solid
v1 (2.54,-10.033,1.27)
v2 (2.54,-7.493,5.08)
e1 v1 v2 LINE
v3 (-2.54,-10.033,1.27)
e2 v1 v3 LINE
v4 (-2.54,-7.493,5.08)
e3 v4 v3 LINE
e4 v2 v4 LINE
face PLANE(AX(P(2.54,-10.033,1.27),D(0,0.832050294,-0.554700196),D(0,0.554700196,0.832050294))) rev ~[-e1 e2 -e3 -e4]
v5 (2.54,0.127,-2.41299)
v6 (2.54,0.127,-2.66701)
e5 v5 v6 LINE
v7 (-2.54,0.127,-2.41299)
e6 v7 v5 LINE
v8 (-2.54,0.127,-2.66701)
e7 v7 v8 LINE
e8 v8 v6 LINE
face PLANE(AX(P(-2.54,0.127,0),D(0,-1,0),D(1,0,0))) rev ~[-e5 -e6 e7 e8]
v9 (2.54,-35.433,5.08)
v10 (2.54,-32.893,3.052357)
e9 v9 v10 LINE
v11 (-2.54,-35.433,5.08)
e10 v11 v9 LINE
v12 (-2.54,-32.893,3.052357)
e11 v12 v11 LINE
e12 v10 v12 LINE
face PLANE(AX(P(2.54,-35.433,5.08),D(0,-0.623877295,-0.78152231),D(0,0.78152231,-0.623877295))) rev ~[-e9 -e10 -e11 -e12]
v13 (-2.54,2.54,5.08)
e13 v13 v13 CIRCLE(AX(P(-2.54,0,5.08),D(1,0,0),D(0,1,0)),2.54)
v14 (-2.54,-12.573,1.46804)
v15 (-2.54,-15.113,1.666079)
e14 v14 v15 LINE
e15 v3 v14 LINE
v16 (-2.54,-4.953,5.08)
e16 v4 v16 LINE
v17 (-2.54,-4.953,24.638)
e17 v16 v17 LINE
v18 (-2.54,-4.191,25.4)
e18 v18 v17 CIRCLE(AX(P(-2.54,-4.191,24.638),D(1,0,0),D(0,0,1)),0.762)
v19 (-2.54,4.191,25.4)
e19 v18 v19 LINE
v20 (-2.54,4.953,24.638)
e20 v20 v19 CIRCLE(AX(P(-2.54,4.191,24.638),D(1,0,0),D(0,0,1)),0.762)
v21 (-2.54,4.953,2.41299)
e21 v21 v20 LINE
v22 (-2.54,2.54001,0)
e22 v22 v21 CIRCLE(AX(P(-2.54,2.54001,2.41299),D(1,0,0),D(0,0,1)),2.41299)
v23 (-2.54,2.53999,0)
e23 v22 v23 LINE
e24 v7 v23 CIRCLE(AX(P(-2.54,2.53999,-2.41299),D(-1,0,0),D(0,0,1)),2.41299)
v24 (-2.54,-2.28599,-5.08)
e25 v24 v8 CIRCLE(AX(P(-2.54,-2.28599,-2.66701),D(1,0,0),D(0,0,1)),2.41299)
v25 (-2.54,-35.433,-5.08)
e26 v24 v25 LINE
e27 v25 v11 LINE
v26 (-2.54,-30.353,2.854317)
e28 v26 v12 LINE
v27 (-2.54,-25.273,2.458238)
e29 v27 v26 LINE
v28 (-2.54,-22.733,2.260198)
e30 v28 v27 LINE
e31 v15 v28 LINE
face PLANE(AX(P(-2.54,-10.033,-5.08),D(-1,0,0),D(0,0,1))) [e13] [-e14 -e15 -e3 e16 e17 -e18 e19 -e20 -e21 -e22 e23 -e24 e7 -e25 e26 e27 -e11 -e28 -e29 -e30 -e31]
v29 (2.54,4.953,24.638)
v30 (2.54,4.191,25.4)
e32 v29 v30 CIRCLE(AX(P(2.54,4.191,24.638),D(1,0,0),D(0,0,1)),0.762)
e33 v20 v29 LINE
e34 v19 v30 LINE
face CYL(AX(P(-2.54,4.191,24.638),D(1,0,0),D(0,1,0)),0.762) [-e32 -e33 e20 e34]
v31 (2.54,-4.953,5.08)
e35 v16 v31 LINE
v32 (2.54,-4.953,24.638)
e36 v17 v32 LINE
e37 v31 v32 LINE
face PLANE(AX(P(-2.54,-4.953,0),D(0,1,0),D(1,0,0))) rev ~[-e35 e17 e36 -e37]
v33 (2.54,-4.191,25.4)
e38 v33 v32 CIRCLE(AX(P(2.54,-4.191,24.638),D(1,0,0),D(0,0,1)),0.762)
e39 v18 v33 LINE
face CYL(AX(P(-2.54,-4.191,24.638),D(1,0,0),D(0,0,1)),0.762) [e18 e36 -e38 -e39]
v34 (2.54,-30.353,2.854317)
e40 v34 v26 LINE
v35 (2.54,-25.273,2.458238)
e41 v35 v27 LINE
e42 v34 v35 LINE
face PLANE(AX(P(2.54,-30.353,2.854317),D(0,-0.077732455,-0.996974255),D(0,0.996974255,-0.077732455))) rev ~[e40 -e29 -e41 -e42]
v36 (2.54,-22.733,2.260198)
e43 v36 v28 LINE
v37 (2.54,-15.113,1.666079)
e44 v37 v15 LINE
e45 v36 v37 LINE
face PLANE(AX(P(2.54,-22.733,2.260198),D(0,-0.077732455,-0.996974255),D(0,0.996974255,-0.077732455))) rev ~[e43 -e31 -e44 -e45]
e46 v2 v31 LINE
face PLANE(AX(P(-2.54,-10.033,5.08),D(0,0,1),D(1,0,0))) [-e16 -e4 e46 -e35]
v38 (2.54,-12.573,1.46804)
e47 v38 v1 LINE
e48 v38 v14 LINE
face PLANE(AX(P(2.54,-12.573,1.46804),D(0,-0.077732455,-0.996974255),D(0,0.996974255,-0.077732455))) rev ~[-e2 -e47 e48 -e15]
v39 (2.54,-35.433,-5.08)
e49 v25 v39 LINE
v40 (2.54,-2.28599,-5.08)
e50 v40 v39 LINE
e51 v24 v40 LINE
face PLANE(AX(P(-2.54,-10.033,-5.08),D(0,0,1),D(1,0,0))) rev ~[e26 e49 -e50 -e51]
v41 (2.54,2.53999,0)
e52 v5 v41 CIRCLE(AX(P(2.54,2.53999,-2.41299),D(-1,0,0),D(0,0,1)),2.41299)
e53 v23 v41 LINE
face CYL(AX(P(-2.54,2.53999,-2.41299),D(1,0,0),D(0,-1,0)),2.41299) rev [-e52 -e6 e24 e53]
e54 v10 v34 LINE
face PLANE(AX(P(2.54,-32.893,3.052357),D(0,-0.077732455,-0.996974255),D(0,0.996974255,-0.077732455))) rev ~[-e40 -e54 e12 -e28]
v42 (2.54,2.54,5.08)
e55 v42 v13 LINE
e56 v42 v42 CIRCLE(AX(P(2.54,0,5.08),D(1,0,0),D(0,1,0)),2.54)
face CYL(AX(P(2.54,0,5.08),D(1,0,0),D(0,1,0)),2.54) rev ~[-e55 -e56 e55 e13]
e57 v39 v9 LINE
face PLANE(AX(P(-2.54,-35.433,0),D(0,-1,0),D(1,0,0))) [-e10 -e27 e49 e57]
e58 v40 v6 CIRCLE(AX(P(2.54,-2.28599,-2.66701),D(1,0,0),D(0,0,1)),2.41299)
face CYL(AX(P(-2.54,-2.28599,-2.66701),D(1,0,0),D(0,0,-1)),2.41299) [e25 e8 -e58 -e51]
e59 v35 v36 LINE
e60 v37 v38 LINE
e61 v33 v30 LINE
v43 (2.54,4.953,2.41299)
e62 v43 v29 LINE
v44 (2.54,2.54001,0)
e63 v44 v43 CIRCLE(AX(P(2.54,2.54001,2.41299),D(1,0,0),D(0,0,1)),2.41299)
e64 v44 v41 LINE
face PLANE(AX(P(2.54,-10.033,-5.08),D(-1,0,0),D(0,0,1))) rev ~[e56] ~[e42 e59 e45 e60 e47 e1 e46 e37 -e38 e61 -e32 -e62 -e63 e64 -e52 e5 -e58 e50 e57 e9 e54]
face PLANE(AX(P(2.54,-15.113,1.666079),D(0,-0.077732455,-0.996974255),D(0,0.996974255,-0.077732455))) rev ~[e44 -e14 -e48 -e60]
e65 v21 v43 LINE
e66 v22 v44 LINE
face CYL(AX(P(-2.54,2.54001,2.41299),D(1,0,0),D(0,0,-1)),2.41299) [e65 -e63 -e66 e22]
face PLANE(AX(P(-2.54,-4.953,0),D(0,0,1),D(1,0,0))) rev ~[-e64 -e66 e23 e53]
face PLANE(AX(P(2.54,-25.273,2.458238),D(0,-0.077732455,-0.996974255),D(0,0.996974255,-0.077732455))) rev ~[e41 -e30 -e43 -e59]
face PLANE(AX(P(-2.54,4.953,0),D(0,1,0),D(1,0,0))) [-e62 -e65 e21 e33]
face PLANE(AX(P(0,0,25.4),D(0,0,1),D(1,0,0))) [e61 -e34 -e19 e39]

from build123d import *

# Parameters (mm, degrees)
F0_W      = 5.08
F0_H      = 9.906
F1_DEPTH  = 25.4
F2_W      = 5.08
F2_H      = 5.08
F3_DEPTH  = 5.08
F4_W      = 5.08
F4_H      = 5.08
F5_DEPTH  = 5.08
F6_DEPTH  = 5.08
F7_DEPTH  = 25.4
F9_DEPTH  = 5.081
F10_R     = 2.41299
F11_R     = 2.54
F12_DEPTH = 5.081
F13_R     = 0.762


# Not quite as in the source:
# - a fillet or chamfer is up to 0.001 mm smaller than in the source, because OpenCascade refuses the exact size


with BuildPart() as f1:
    # F0 (on Top) → F1 (new body)
    with BuildSketch(Plane.XY):
        Rectangle(F0_W, F0_H)
    extrude(amount=F1_DEPTH)

    # F2 (on face) → F3 (join)
    with BuildSketch(Plane.XZ.offset(4.953)):
        with Locations((0, 2.54)):
            Rectangle(F2_W, F2_H)
    extrude(amount=F3_DEPTH)

    # F4 (on face) → F5 (join)
    with BuildSketch(Plane(origin=(0, 0, 0), x_dir=(1, 0, 0), z_dir=(0, 0, -1))):
        with Locations((0, 7.493)):
            Rectangle(F4_W, F4_H)
    extrude(amount=F5_DEPTH)

    # F6 (add): a face of the model
    f6_faces = [f1.faces().sort_by_distance(p)[0] for p in [
        (0, -4.953, -2.54),
    ]]
    extrude(f6_faces, amount=F6_DEPTH)

    # F7 (add): a face of the model
    f7_faces = [f1.faces().sort_by_distance(p)[0] for p in [
        (0, -10.033, 0),
    ]]
    extrude(f7_faces, amount=F7_DEPTH)

    # F8 (on face) → F9 (cut, through all)
    with BuildSketch(Plane.YZ.offset(2.54)):
        Polygon((-7.493, 5.08), (-10.033, 5.08), (-10.033, 1.27), align=None)
        Polygon((-10.033, 5.08), (-12.573, 5.08), (-12.573, 1.468039654), (-10.033, 1.27), align=None)
        Polygon((-12.573, 5.08), (-15.113, 5.08), (-15.113, 1.6660793079), (-12.573, 1.468039654), align=None)
        Polygon((-15.113, 5.08), (-17.653, 5.08), (-17.653, 1.8641189619), (-15.113, 1.6660793079), align=None)
        Polygon((-20.193, 5.08), (-22.733, 5.08), (-22.733, 2.2601982699), (-20.193, 2.0621586159), align=None)
        Polygon((-17.653, 5.08), (-20.193, 5.08), (-20.193, 2.0621586159), (-17.653, 1.8641189619), align=None)
        Polygon((-22.733, 5.08), (-25.273, 5.08), (-25.273, 2.4582379238), (-22.733, 2.2601982699), align=None)
        Polygon((-25.273, 5.08), (-27.813, 5.08), (-27.813, 2.6562775778), (-25.273, 2.4582379238), align=None)
        Polygon((-27.813, 5.08), (-30.353, 5.08), (-30.353, 2.8543172318), (-27.813, 2.6562775778), align=None)
        Polygon((-30.353, 5.08), (-32.893, 5.08), (-32.893, 3.0523568857), (-30.353, 2.8543172318), align=None)
        Polygon((-32.893, 5.08), (-35.433, 5.08), (-32.893, 3.0523568857), align=None)
    extrude(amount=-F9_DEPTH, mode=Mode.SUBTRACT)

    # F10 (radius 2.413 in the source; OpenCascade refuses exactly that, so slightly less here)
    f10_edges = [f1.edges().sort_by_distance(p)[0] for p in [
        (0, 0.127, -5.08),
        (0, 0.127, 0),
        (0, 4.953, 0),
    ]]
    fillet(f10_edges, radius=F10_R)

    # F11 (on face) → F12 (cut, through all)
    with BuildSketch(Plane.YZ.offset(2.54)):
        with Locations((0, 5.08)):
            Circle(F11_R)
    extrude(amount=-F12_DEPTH, mode=Mode.SUBTRACT)

    # F13
    f13_edges = [f1.edges().sort_by_distance(p)[0] for p in [
        (0, 4.953, 25.4),
        (0, -4.953, 25.4),
    ]]
    fillet(f13_edges, radius=F13_R)


solid = f1.part
